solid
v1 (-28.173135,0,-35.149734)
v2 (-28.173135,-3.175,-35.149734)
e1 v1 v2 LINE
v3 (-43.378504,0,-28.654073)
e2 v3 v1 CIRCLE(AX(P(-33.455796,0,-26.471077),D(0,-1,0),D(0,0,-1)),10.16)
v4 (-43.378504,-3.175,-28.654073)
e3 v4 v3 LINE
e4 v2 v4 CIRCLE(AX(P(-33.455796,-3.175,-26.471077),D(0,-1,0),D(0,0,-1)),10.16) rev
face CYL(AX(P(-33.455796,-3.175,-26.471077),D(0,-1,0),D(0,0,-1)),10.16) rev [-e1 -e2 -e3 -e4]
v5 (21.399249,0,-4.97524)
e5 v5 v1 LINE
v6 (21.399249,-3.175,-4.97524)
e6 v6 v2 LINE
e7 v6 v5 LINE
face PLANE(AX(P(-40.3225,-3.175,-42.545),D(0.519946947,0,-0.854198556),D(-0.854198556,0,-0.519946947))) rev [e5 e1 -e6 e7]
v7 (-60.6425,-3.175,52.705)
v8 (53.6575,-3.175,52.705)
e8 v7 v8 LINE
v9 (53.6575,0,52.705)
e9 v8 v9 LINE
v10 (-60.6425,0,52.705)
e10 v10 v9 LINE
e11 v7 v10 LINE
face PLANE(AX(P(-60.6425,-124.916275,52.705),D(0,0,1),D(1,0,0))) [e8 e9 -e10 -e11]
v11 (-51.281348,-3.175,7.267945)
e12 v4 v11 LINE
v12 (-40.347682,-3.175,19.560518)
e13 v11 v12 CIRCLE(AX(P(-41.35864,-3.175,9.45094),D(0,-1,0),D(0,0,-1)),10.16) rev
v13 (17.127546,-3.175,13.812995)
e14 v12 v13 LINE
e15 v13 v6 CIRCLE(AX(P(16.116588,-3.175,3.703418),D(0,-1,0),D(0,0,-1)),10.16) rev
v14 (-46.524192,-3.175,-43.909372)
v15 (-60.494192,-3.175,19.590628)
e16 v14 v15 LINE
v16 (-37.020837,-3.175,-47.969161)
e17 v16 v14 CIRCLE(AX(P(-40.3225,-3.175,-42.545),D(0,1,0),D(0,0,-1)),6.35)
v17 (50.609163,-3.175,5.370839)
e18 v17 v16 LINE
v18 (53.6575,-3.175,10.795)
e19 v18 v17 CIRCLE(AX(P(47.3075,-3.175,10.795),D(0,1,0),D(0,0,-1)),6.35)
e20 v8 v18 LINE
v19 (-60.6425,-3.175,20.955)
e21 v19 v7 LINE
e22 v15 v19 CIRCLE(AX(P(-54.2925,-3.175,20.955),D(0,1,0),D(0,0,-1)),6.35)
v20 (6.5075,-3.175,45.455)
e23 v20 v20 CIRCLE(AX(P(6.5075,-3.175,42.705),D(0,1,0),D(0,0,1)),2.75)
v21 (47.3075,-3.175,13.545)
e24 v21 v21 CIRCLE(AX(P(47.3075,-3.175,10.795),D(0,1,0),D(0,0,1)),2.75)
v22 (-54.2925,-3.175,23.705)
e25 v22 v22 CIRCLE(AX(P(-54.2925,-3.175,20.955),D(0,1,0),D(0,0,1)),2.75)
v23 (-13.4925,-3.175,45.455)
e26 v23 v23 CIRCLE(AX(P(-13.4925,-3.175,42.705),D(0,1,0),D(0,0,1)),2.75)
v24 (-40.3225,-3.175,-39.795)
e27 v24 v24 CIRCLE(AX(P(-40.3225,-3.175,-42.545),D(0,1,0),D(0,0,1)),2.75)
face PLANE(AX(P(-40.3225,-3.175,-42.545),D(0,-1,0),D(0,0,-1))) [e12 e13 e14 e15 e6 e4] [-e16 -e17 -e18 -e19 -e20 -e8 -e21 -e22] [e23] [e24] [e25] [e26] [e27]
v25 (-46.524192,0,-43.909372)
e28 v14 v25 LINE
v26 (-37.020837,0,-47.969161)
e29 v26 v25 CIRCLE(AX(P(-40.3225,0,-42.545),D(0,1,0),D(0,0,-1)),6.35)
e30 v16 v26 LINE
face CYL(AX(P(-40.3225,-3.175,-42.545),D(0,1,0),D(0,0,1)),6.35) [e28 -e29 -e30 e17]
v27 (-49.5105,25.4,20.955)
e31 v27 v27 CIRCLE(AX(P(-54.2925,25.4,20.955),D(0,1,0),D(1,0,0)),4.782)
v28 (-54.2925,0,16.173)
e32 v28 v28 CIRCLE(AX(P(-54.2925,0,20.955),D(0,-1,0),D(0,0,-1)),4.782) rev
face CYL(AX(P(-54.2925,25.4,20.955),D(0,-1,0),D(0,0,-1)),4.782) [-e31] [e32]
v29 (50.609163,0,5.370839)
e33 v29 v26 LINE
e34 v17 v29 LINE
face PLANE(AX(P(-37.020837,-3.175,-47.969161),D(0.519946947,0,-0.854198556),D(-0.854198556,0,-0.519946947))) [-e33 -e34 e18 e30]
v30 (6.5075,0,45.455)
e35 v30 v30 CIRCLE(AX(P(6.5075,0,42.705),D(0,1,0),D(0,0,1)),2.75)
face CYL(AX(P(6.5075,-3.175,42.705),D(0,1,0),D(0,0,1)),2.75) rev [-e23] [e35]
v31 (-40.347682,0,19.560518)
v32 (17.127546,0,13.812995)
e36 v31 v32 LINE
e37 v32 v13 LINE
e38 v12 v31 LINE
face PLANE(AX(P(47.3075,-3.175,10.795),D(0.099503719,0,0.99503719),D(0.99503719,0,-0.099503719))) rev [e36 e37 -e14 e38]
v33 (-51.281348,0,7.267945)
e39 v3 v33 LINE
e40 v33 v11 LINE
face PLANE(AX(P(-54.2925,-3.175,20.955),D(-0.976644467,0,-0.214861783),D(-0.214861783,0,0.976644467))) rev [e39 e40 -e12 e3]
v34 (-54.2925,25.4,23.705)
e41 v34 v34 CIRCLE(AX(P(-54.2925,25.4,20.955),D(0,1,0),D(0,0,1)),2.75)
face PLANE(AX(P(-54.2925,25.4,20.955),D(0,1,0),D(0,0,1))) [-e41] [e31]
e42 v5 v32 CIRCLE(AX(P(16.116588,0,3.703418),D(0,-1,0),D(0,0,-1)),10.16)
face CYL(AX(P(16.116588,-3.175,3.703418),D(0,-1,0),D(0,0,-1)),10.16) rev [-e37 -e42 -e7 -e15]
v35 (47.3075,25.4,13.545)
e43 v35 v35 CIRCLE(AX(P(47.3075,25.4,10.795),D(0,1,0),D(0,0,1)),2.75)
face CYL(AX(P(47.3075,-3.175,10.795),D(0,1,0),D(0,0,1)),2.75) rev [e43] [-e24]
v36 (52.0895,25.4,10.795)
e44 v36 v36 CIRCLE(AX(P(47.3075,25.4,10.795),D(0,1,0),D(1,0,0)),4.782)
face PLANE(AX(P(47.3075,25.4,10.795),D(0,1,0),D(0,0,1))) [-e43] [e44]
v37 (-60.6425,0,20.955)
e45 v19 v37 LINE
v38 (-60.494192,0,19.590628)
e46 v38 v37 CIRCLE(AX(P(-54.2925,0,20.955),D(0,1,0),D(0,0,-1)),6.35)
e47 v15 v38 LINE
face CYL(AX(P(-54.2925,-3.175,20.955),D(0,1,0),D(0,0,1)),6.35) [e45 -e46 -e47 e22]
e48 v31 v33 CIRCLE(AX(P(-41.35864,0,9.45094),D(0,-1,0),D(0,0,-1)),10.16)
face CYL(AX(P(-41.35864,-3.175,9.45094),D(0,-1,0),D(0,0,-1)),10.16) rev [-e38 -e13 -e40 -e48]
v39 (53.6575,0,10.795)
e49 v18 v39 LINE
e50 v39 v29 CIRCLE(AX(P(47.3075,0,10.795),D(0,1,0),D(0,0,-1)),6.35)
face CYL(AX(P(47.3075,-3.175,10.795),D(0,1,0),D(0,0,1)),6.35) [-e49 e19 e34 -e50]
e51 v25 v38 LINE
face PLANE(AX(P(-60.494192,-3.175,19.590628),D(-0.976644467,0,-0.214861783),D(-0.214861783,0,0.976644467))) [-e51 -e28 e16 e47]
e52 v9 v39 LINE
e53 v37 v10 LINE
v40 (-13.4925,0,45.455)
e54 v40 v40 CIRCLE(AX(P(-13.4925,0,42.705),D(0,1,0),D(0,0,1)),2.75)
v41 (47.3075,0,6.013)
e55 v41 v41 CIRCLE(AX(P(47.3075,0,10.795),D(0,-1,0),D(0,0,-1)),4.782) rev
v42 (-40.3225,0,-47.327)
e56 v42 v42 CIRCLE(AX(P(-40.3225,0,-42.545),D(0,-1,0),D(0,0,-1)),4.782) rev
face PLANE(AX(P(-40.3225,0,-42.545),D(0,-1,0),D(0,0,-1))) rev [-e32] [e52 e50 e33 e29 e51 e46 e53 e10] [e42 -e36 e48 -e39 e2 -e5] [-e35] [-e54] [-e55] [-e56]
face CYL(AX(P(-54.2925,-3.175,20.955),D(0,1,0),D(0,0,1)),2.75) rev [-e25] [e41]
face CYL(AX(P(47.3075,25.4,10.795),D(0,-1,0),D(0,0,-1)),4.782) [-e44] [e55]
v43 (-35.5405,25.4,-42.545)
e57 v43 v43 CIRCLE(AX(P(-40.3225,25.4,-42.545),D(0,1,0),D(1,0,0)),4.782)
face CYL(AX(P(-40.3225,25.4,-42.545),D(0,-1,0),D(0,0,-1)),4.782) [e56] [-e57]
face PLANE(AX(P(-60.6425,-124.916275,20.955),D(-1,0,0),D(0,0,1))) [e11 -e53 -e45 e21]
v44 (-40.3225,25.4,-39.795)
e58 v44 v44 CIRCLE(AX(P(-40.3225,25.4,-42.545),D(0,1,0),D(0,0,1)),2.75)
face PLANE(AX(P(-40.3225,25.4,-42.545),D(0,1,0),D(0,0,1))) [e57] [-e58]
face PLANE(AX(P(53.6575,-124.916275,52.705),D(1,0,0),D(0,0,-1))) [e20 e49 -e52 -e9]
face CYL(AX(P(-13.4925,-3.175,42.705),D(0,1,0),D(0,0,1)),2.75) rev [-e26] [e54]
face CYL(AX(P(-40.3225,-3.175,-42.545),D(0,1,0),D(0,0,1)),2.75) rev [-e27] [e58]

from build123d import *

# Parameters (mm, degrees)
BOSS_EXTRUDE1_DEPTH = 3.175
SHELL1_START        = -3.175
SHELL1_DEPTH        = 3.175
FILLET1_R           = 10.16
BOSS_EXTRUDE2_DEPTH = 3.175
SKETCH1_R           = 2.75
CUT_EXTRUDE1_DEPTH  = 81.407776093
EXTRUDE_THIN1_START = 25.4
SKETCH5_R           = 4.782
SKETCH5_R_2         = 2.75
EXTRUDE_THIN1_DEPTH = 25.4
SKETCH6_R           = 2.749999961
CUT_EXTRUDE2_DEPTH  = 85.264404295


# Read off the part's stored shape, not the designer's step: Shell1
with BuildPart() as part:
    # Sketch2 → Boss-Extrude1 (new body)
    with BuildSketch(Plane(origin=(0, 0, 0), x_dir=(1, 0, 0), z_dir=(0, 1, 0))):
        with BuildLine():
            Line((-60.494192364, -19.59062768), (-46.524192364, 43.90937232))
            ThreePointArc((-46.524192364, 43.90937232), (-42.81709678, 48.384476595), (-37.020836887, 47.969160828))
            Line((-37.020836887, 47.969160828), (50.609163113, -5.370839172))
            ThreePointArc((50.609163113, -5.370839172), (53.499476113, -12.202811), (47.939348616, -17.113486158))
            Line((47.939348616, -17.113486158), (-53.660651384, -27.273486158))
            ThreePointArc((-53.660651384, -27.273486158), (-59.037220059, -25.175205156), (-60.494192364, -19.59062768))
        make_face()
    extrude(amount=-BOSS_EXTRUDE1_DEPTH)

    # Shell1 outline → Shell1 (cut)
    with BuildSketch(Plane(origin=(0, 0, 0), x_dir=(1, 0, 0), z_dir=(0, 1, 0)).offset(SHELL1_START)):
        Polygon((-54.2925, -20.955), (47.3075, -10.795), (-40.3225, 42.545), align=None)
    extrude(amount=SHELL1_DEPTH, mode=Mode.SUBTRACT)

    # Fillet1
    fillet1_edges = [part.edges().sort_by_distance(p)[0] for p in [
        (-40.3225, -1.5875, -42.545),
        (47.3075, -1.5875, 10.795),
        (-54.2925, -1.5875, 20.955),
    ]]
    fillet(fillet1_edges, radius=FILLET1_R)

    # Sketch3 → Boss-Extrude2 (add)
    with BuildSketch(Plane(origin=(0, 0, 0), x_dir=(1, 0, 0), z_dir=(0, 1, 0))):
        with BuildLine():
            Line((-60.6425, -20.955), (-60.6425, -52.705))
            Line((-60.6425, -52.705), (53.6575, -52.705))
            Line((53.6575, -52.705), (53.6575, -10.795))
            ThreePointArc((53.6575, -10.795), (52.015723588, -15.055883787), (47.939348616, -17.113486158))
            Line((47.939348616, -17.113486158), (-53.660651384, -27.273486158))
            ThreePointArc((-53.660651384, -27.273486158), (-58.553383787, -25.663223588), (-60.6425, -20.955))
        make_face()
    extrude(amount=-BOSS_EXTRUDE2_DEPTH)

    # Sketch1 → Cut-Extrude1 (cut, through all)
    with BuildSketch(Plane(origin=(0, 0, 0), x_dir=(1, 0, 0), z_dir=(0, 1, 0))):
        with Locations(Location((-54.2925, -20.955, 0), (0, 0, 270))):
            Circle(SKETCH1_R)
        with Locations(Location((47.3075, -10.795, 0), (0, 0, 270))):
            Circle(SKETCH1_R)
        with Locations(Location((-40.3225, 42.545, 0), (0, 0, 270))):
            Circle(SKETCH1_R)
    extrude(amount=-CUT_EXTRUDE1_DEPTH, mode=Mode.SUBTRACT)

    # Sketch5 → Extrude-Thin1 (add)
    # profile 1 of 3: a face of its own
    with BuildSketch(Plane(origin=(0, 0, 0), x_dir=(1, 0, 0), z_dir=(0, 1, 0)).offset(EXTRUDE_THIN1_START)):
        with Locations((47.3075, -10.795)):
            Circle(SKETCH5_R)
        with Locations((47.3075, -10.795)):
            Circle(SKETCH5_R_2, mode=Mode.SUBTRACT)
    # profile 2 of 3: a face of its own
    with BuildSketch(Plane(origin=(0, 0, 0), x_dir=(1, 0, 0), z_dir=(0, 1, 0)).offset(EXTRUDE_THIN1_START)):
        with Locations((-54.2925, -20.955)):
            Circle(SKETCH5_R)
        with Locations((-54.2925, -20.955)):
            Circle(SKETCH5_R_2, mode=Mode.SUBTRACT)
    # profile 3 of 3: a face of its own
    with BuildSketch(Plane(origin=(0, 0, 0), x_dir=(1, 0, 0), z_dir=(0, 1, 0)).offset(EXTRUDE_THIN1_START)):
        with Locations((-40.3225, 42.545)):
            Circle(SKETCH5_R)
        with Locations((-40.3225, 42.545)):
            Circle(SKETCH5_R_2, mode=Mode.SUBTRACT)
    extrude(amount=-EXTRUDE_THIN1_DEPTH)

    # Sketch6 → Cut-Extrude2 (cut, through all)
    with BuildSketch(Plane(origin=(0, 0, 0), x_dir=(1, 0, 0), z_dir=(0, 1, 0))):
        with Locations(Location((-13.492499939, -42.705, 0), (0, 0, 270))):
            Circle(SKETCH6_R)
        with Locations(Location((6.507499939, -42.705, 0), (0, 0, 270))):
            Circle(SKETCH6_R)
    extrude(amount=-CUT_EXTRUDE2_DEPTH, mode=Mode.SUBTRACT)


solid = part.part
